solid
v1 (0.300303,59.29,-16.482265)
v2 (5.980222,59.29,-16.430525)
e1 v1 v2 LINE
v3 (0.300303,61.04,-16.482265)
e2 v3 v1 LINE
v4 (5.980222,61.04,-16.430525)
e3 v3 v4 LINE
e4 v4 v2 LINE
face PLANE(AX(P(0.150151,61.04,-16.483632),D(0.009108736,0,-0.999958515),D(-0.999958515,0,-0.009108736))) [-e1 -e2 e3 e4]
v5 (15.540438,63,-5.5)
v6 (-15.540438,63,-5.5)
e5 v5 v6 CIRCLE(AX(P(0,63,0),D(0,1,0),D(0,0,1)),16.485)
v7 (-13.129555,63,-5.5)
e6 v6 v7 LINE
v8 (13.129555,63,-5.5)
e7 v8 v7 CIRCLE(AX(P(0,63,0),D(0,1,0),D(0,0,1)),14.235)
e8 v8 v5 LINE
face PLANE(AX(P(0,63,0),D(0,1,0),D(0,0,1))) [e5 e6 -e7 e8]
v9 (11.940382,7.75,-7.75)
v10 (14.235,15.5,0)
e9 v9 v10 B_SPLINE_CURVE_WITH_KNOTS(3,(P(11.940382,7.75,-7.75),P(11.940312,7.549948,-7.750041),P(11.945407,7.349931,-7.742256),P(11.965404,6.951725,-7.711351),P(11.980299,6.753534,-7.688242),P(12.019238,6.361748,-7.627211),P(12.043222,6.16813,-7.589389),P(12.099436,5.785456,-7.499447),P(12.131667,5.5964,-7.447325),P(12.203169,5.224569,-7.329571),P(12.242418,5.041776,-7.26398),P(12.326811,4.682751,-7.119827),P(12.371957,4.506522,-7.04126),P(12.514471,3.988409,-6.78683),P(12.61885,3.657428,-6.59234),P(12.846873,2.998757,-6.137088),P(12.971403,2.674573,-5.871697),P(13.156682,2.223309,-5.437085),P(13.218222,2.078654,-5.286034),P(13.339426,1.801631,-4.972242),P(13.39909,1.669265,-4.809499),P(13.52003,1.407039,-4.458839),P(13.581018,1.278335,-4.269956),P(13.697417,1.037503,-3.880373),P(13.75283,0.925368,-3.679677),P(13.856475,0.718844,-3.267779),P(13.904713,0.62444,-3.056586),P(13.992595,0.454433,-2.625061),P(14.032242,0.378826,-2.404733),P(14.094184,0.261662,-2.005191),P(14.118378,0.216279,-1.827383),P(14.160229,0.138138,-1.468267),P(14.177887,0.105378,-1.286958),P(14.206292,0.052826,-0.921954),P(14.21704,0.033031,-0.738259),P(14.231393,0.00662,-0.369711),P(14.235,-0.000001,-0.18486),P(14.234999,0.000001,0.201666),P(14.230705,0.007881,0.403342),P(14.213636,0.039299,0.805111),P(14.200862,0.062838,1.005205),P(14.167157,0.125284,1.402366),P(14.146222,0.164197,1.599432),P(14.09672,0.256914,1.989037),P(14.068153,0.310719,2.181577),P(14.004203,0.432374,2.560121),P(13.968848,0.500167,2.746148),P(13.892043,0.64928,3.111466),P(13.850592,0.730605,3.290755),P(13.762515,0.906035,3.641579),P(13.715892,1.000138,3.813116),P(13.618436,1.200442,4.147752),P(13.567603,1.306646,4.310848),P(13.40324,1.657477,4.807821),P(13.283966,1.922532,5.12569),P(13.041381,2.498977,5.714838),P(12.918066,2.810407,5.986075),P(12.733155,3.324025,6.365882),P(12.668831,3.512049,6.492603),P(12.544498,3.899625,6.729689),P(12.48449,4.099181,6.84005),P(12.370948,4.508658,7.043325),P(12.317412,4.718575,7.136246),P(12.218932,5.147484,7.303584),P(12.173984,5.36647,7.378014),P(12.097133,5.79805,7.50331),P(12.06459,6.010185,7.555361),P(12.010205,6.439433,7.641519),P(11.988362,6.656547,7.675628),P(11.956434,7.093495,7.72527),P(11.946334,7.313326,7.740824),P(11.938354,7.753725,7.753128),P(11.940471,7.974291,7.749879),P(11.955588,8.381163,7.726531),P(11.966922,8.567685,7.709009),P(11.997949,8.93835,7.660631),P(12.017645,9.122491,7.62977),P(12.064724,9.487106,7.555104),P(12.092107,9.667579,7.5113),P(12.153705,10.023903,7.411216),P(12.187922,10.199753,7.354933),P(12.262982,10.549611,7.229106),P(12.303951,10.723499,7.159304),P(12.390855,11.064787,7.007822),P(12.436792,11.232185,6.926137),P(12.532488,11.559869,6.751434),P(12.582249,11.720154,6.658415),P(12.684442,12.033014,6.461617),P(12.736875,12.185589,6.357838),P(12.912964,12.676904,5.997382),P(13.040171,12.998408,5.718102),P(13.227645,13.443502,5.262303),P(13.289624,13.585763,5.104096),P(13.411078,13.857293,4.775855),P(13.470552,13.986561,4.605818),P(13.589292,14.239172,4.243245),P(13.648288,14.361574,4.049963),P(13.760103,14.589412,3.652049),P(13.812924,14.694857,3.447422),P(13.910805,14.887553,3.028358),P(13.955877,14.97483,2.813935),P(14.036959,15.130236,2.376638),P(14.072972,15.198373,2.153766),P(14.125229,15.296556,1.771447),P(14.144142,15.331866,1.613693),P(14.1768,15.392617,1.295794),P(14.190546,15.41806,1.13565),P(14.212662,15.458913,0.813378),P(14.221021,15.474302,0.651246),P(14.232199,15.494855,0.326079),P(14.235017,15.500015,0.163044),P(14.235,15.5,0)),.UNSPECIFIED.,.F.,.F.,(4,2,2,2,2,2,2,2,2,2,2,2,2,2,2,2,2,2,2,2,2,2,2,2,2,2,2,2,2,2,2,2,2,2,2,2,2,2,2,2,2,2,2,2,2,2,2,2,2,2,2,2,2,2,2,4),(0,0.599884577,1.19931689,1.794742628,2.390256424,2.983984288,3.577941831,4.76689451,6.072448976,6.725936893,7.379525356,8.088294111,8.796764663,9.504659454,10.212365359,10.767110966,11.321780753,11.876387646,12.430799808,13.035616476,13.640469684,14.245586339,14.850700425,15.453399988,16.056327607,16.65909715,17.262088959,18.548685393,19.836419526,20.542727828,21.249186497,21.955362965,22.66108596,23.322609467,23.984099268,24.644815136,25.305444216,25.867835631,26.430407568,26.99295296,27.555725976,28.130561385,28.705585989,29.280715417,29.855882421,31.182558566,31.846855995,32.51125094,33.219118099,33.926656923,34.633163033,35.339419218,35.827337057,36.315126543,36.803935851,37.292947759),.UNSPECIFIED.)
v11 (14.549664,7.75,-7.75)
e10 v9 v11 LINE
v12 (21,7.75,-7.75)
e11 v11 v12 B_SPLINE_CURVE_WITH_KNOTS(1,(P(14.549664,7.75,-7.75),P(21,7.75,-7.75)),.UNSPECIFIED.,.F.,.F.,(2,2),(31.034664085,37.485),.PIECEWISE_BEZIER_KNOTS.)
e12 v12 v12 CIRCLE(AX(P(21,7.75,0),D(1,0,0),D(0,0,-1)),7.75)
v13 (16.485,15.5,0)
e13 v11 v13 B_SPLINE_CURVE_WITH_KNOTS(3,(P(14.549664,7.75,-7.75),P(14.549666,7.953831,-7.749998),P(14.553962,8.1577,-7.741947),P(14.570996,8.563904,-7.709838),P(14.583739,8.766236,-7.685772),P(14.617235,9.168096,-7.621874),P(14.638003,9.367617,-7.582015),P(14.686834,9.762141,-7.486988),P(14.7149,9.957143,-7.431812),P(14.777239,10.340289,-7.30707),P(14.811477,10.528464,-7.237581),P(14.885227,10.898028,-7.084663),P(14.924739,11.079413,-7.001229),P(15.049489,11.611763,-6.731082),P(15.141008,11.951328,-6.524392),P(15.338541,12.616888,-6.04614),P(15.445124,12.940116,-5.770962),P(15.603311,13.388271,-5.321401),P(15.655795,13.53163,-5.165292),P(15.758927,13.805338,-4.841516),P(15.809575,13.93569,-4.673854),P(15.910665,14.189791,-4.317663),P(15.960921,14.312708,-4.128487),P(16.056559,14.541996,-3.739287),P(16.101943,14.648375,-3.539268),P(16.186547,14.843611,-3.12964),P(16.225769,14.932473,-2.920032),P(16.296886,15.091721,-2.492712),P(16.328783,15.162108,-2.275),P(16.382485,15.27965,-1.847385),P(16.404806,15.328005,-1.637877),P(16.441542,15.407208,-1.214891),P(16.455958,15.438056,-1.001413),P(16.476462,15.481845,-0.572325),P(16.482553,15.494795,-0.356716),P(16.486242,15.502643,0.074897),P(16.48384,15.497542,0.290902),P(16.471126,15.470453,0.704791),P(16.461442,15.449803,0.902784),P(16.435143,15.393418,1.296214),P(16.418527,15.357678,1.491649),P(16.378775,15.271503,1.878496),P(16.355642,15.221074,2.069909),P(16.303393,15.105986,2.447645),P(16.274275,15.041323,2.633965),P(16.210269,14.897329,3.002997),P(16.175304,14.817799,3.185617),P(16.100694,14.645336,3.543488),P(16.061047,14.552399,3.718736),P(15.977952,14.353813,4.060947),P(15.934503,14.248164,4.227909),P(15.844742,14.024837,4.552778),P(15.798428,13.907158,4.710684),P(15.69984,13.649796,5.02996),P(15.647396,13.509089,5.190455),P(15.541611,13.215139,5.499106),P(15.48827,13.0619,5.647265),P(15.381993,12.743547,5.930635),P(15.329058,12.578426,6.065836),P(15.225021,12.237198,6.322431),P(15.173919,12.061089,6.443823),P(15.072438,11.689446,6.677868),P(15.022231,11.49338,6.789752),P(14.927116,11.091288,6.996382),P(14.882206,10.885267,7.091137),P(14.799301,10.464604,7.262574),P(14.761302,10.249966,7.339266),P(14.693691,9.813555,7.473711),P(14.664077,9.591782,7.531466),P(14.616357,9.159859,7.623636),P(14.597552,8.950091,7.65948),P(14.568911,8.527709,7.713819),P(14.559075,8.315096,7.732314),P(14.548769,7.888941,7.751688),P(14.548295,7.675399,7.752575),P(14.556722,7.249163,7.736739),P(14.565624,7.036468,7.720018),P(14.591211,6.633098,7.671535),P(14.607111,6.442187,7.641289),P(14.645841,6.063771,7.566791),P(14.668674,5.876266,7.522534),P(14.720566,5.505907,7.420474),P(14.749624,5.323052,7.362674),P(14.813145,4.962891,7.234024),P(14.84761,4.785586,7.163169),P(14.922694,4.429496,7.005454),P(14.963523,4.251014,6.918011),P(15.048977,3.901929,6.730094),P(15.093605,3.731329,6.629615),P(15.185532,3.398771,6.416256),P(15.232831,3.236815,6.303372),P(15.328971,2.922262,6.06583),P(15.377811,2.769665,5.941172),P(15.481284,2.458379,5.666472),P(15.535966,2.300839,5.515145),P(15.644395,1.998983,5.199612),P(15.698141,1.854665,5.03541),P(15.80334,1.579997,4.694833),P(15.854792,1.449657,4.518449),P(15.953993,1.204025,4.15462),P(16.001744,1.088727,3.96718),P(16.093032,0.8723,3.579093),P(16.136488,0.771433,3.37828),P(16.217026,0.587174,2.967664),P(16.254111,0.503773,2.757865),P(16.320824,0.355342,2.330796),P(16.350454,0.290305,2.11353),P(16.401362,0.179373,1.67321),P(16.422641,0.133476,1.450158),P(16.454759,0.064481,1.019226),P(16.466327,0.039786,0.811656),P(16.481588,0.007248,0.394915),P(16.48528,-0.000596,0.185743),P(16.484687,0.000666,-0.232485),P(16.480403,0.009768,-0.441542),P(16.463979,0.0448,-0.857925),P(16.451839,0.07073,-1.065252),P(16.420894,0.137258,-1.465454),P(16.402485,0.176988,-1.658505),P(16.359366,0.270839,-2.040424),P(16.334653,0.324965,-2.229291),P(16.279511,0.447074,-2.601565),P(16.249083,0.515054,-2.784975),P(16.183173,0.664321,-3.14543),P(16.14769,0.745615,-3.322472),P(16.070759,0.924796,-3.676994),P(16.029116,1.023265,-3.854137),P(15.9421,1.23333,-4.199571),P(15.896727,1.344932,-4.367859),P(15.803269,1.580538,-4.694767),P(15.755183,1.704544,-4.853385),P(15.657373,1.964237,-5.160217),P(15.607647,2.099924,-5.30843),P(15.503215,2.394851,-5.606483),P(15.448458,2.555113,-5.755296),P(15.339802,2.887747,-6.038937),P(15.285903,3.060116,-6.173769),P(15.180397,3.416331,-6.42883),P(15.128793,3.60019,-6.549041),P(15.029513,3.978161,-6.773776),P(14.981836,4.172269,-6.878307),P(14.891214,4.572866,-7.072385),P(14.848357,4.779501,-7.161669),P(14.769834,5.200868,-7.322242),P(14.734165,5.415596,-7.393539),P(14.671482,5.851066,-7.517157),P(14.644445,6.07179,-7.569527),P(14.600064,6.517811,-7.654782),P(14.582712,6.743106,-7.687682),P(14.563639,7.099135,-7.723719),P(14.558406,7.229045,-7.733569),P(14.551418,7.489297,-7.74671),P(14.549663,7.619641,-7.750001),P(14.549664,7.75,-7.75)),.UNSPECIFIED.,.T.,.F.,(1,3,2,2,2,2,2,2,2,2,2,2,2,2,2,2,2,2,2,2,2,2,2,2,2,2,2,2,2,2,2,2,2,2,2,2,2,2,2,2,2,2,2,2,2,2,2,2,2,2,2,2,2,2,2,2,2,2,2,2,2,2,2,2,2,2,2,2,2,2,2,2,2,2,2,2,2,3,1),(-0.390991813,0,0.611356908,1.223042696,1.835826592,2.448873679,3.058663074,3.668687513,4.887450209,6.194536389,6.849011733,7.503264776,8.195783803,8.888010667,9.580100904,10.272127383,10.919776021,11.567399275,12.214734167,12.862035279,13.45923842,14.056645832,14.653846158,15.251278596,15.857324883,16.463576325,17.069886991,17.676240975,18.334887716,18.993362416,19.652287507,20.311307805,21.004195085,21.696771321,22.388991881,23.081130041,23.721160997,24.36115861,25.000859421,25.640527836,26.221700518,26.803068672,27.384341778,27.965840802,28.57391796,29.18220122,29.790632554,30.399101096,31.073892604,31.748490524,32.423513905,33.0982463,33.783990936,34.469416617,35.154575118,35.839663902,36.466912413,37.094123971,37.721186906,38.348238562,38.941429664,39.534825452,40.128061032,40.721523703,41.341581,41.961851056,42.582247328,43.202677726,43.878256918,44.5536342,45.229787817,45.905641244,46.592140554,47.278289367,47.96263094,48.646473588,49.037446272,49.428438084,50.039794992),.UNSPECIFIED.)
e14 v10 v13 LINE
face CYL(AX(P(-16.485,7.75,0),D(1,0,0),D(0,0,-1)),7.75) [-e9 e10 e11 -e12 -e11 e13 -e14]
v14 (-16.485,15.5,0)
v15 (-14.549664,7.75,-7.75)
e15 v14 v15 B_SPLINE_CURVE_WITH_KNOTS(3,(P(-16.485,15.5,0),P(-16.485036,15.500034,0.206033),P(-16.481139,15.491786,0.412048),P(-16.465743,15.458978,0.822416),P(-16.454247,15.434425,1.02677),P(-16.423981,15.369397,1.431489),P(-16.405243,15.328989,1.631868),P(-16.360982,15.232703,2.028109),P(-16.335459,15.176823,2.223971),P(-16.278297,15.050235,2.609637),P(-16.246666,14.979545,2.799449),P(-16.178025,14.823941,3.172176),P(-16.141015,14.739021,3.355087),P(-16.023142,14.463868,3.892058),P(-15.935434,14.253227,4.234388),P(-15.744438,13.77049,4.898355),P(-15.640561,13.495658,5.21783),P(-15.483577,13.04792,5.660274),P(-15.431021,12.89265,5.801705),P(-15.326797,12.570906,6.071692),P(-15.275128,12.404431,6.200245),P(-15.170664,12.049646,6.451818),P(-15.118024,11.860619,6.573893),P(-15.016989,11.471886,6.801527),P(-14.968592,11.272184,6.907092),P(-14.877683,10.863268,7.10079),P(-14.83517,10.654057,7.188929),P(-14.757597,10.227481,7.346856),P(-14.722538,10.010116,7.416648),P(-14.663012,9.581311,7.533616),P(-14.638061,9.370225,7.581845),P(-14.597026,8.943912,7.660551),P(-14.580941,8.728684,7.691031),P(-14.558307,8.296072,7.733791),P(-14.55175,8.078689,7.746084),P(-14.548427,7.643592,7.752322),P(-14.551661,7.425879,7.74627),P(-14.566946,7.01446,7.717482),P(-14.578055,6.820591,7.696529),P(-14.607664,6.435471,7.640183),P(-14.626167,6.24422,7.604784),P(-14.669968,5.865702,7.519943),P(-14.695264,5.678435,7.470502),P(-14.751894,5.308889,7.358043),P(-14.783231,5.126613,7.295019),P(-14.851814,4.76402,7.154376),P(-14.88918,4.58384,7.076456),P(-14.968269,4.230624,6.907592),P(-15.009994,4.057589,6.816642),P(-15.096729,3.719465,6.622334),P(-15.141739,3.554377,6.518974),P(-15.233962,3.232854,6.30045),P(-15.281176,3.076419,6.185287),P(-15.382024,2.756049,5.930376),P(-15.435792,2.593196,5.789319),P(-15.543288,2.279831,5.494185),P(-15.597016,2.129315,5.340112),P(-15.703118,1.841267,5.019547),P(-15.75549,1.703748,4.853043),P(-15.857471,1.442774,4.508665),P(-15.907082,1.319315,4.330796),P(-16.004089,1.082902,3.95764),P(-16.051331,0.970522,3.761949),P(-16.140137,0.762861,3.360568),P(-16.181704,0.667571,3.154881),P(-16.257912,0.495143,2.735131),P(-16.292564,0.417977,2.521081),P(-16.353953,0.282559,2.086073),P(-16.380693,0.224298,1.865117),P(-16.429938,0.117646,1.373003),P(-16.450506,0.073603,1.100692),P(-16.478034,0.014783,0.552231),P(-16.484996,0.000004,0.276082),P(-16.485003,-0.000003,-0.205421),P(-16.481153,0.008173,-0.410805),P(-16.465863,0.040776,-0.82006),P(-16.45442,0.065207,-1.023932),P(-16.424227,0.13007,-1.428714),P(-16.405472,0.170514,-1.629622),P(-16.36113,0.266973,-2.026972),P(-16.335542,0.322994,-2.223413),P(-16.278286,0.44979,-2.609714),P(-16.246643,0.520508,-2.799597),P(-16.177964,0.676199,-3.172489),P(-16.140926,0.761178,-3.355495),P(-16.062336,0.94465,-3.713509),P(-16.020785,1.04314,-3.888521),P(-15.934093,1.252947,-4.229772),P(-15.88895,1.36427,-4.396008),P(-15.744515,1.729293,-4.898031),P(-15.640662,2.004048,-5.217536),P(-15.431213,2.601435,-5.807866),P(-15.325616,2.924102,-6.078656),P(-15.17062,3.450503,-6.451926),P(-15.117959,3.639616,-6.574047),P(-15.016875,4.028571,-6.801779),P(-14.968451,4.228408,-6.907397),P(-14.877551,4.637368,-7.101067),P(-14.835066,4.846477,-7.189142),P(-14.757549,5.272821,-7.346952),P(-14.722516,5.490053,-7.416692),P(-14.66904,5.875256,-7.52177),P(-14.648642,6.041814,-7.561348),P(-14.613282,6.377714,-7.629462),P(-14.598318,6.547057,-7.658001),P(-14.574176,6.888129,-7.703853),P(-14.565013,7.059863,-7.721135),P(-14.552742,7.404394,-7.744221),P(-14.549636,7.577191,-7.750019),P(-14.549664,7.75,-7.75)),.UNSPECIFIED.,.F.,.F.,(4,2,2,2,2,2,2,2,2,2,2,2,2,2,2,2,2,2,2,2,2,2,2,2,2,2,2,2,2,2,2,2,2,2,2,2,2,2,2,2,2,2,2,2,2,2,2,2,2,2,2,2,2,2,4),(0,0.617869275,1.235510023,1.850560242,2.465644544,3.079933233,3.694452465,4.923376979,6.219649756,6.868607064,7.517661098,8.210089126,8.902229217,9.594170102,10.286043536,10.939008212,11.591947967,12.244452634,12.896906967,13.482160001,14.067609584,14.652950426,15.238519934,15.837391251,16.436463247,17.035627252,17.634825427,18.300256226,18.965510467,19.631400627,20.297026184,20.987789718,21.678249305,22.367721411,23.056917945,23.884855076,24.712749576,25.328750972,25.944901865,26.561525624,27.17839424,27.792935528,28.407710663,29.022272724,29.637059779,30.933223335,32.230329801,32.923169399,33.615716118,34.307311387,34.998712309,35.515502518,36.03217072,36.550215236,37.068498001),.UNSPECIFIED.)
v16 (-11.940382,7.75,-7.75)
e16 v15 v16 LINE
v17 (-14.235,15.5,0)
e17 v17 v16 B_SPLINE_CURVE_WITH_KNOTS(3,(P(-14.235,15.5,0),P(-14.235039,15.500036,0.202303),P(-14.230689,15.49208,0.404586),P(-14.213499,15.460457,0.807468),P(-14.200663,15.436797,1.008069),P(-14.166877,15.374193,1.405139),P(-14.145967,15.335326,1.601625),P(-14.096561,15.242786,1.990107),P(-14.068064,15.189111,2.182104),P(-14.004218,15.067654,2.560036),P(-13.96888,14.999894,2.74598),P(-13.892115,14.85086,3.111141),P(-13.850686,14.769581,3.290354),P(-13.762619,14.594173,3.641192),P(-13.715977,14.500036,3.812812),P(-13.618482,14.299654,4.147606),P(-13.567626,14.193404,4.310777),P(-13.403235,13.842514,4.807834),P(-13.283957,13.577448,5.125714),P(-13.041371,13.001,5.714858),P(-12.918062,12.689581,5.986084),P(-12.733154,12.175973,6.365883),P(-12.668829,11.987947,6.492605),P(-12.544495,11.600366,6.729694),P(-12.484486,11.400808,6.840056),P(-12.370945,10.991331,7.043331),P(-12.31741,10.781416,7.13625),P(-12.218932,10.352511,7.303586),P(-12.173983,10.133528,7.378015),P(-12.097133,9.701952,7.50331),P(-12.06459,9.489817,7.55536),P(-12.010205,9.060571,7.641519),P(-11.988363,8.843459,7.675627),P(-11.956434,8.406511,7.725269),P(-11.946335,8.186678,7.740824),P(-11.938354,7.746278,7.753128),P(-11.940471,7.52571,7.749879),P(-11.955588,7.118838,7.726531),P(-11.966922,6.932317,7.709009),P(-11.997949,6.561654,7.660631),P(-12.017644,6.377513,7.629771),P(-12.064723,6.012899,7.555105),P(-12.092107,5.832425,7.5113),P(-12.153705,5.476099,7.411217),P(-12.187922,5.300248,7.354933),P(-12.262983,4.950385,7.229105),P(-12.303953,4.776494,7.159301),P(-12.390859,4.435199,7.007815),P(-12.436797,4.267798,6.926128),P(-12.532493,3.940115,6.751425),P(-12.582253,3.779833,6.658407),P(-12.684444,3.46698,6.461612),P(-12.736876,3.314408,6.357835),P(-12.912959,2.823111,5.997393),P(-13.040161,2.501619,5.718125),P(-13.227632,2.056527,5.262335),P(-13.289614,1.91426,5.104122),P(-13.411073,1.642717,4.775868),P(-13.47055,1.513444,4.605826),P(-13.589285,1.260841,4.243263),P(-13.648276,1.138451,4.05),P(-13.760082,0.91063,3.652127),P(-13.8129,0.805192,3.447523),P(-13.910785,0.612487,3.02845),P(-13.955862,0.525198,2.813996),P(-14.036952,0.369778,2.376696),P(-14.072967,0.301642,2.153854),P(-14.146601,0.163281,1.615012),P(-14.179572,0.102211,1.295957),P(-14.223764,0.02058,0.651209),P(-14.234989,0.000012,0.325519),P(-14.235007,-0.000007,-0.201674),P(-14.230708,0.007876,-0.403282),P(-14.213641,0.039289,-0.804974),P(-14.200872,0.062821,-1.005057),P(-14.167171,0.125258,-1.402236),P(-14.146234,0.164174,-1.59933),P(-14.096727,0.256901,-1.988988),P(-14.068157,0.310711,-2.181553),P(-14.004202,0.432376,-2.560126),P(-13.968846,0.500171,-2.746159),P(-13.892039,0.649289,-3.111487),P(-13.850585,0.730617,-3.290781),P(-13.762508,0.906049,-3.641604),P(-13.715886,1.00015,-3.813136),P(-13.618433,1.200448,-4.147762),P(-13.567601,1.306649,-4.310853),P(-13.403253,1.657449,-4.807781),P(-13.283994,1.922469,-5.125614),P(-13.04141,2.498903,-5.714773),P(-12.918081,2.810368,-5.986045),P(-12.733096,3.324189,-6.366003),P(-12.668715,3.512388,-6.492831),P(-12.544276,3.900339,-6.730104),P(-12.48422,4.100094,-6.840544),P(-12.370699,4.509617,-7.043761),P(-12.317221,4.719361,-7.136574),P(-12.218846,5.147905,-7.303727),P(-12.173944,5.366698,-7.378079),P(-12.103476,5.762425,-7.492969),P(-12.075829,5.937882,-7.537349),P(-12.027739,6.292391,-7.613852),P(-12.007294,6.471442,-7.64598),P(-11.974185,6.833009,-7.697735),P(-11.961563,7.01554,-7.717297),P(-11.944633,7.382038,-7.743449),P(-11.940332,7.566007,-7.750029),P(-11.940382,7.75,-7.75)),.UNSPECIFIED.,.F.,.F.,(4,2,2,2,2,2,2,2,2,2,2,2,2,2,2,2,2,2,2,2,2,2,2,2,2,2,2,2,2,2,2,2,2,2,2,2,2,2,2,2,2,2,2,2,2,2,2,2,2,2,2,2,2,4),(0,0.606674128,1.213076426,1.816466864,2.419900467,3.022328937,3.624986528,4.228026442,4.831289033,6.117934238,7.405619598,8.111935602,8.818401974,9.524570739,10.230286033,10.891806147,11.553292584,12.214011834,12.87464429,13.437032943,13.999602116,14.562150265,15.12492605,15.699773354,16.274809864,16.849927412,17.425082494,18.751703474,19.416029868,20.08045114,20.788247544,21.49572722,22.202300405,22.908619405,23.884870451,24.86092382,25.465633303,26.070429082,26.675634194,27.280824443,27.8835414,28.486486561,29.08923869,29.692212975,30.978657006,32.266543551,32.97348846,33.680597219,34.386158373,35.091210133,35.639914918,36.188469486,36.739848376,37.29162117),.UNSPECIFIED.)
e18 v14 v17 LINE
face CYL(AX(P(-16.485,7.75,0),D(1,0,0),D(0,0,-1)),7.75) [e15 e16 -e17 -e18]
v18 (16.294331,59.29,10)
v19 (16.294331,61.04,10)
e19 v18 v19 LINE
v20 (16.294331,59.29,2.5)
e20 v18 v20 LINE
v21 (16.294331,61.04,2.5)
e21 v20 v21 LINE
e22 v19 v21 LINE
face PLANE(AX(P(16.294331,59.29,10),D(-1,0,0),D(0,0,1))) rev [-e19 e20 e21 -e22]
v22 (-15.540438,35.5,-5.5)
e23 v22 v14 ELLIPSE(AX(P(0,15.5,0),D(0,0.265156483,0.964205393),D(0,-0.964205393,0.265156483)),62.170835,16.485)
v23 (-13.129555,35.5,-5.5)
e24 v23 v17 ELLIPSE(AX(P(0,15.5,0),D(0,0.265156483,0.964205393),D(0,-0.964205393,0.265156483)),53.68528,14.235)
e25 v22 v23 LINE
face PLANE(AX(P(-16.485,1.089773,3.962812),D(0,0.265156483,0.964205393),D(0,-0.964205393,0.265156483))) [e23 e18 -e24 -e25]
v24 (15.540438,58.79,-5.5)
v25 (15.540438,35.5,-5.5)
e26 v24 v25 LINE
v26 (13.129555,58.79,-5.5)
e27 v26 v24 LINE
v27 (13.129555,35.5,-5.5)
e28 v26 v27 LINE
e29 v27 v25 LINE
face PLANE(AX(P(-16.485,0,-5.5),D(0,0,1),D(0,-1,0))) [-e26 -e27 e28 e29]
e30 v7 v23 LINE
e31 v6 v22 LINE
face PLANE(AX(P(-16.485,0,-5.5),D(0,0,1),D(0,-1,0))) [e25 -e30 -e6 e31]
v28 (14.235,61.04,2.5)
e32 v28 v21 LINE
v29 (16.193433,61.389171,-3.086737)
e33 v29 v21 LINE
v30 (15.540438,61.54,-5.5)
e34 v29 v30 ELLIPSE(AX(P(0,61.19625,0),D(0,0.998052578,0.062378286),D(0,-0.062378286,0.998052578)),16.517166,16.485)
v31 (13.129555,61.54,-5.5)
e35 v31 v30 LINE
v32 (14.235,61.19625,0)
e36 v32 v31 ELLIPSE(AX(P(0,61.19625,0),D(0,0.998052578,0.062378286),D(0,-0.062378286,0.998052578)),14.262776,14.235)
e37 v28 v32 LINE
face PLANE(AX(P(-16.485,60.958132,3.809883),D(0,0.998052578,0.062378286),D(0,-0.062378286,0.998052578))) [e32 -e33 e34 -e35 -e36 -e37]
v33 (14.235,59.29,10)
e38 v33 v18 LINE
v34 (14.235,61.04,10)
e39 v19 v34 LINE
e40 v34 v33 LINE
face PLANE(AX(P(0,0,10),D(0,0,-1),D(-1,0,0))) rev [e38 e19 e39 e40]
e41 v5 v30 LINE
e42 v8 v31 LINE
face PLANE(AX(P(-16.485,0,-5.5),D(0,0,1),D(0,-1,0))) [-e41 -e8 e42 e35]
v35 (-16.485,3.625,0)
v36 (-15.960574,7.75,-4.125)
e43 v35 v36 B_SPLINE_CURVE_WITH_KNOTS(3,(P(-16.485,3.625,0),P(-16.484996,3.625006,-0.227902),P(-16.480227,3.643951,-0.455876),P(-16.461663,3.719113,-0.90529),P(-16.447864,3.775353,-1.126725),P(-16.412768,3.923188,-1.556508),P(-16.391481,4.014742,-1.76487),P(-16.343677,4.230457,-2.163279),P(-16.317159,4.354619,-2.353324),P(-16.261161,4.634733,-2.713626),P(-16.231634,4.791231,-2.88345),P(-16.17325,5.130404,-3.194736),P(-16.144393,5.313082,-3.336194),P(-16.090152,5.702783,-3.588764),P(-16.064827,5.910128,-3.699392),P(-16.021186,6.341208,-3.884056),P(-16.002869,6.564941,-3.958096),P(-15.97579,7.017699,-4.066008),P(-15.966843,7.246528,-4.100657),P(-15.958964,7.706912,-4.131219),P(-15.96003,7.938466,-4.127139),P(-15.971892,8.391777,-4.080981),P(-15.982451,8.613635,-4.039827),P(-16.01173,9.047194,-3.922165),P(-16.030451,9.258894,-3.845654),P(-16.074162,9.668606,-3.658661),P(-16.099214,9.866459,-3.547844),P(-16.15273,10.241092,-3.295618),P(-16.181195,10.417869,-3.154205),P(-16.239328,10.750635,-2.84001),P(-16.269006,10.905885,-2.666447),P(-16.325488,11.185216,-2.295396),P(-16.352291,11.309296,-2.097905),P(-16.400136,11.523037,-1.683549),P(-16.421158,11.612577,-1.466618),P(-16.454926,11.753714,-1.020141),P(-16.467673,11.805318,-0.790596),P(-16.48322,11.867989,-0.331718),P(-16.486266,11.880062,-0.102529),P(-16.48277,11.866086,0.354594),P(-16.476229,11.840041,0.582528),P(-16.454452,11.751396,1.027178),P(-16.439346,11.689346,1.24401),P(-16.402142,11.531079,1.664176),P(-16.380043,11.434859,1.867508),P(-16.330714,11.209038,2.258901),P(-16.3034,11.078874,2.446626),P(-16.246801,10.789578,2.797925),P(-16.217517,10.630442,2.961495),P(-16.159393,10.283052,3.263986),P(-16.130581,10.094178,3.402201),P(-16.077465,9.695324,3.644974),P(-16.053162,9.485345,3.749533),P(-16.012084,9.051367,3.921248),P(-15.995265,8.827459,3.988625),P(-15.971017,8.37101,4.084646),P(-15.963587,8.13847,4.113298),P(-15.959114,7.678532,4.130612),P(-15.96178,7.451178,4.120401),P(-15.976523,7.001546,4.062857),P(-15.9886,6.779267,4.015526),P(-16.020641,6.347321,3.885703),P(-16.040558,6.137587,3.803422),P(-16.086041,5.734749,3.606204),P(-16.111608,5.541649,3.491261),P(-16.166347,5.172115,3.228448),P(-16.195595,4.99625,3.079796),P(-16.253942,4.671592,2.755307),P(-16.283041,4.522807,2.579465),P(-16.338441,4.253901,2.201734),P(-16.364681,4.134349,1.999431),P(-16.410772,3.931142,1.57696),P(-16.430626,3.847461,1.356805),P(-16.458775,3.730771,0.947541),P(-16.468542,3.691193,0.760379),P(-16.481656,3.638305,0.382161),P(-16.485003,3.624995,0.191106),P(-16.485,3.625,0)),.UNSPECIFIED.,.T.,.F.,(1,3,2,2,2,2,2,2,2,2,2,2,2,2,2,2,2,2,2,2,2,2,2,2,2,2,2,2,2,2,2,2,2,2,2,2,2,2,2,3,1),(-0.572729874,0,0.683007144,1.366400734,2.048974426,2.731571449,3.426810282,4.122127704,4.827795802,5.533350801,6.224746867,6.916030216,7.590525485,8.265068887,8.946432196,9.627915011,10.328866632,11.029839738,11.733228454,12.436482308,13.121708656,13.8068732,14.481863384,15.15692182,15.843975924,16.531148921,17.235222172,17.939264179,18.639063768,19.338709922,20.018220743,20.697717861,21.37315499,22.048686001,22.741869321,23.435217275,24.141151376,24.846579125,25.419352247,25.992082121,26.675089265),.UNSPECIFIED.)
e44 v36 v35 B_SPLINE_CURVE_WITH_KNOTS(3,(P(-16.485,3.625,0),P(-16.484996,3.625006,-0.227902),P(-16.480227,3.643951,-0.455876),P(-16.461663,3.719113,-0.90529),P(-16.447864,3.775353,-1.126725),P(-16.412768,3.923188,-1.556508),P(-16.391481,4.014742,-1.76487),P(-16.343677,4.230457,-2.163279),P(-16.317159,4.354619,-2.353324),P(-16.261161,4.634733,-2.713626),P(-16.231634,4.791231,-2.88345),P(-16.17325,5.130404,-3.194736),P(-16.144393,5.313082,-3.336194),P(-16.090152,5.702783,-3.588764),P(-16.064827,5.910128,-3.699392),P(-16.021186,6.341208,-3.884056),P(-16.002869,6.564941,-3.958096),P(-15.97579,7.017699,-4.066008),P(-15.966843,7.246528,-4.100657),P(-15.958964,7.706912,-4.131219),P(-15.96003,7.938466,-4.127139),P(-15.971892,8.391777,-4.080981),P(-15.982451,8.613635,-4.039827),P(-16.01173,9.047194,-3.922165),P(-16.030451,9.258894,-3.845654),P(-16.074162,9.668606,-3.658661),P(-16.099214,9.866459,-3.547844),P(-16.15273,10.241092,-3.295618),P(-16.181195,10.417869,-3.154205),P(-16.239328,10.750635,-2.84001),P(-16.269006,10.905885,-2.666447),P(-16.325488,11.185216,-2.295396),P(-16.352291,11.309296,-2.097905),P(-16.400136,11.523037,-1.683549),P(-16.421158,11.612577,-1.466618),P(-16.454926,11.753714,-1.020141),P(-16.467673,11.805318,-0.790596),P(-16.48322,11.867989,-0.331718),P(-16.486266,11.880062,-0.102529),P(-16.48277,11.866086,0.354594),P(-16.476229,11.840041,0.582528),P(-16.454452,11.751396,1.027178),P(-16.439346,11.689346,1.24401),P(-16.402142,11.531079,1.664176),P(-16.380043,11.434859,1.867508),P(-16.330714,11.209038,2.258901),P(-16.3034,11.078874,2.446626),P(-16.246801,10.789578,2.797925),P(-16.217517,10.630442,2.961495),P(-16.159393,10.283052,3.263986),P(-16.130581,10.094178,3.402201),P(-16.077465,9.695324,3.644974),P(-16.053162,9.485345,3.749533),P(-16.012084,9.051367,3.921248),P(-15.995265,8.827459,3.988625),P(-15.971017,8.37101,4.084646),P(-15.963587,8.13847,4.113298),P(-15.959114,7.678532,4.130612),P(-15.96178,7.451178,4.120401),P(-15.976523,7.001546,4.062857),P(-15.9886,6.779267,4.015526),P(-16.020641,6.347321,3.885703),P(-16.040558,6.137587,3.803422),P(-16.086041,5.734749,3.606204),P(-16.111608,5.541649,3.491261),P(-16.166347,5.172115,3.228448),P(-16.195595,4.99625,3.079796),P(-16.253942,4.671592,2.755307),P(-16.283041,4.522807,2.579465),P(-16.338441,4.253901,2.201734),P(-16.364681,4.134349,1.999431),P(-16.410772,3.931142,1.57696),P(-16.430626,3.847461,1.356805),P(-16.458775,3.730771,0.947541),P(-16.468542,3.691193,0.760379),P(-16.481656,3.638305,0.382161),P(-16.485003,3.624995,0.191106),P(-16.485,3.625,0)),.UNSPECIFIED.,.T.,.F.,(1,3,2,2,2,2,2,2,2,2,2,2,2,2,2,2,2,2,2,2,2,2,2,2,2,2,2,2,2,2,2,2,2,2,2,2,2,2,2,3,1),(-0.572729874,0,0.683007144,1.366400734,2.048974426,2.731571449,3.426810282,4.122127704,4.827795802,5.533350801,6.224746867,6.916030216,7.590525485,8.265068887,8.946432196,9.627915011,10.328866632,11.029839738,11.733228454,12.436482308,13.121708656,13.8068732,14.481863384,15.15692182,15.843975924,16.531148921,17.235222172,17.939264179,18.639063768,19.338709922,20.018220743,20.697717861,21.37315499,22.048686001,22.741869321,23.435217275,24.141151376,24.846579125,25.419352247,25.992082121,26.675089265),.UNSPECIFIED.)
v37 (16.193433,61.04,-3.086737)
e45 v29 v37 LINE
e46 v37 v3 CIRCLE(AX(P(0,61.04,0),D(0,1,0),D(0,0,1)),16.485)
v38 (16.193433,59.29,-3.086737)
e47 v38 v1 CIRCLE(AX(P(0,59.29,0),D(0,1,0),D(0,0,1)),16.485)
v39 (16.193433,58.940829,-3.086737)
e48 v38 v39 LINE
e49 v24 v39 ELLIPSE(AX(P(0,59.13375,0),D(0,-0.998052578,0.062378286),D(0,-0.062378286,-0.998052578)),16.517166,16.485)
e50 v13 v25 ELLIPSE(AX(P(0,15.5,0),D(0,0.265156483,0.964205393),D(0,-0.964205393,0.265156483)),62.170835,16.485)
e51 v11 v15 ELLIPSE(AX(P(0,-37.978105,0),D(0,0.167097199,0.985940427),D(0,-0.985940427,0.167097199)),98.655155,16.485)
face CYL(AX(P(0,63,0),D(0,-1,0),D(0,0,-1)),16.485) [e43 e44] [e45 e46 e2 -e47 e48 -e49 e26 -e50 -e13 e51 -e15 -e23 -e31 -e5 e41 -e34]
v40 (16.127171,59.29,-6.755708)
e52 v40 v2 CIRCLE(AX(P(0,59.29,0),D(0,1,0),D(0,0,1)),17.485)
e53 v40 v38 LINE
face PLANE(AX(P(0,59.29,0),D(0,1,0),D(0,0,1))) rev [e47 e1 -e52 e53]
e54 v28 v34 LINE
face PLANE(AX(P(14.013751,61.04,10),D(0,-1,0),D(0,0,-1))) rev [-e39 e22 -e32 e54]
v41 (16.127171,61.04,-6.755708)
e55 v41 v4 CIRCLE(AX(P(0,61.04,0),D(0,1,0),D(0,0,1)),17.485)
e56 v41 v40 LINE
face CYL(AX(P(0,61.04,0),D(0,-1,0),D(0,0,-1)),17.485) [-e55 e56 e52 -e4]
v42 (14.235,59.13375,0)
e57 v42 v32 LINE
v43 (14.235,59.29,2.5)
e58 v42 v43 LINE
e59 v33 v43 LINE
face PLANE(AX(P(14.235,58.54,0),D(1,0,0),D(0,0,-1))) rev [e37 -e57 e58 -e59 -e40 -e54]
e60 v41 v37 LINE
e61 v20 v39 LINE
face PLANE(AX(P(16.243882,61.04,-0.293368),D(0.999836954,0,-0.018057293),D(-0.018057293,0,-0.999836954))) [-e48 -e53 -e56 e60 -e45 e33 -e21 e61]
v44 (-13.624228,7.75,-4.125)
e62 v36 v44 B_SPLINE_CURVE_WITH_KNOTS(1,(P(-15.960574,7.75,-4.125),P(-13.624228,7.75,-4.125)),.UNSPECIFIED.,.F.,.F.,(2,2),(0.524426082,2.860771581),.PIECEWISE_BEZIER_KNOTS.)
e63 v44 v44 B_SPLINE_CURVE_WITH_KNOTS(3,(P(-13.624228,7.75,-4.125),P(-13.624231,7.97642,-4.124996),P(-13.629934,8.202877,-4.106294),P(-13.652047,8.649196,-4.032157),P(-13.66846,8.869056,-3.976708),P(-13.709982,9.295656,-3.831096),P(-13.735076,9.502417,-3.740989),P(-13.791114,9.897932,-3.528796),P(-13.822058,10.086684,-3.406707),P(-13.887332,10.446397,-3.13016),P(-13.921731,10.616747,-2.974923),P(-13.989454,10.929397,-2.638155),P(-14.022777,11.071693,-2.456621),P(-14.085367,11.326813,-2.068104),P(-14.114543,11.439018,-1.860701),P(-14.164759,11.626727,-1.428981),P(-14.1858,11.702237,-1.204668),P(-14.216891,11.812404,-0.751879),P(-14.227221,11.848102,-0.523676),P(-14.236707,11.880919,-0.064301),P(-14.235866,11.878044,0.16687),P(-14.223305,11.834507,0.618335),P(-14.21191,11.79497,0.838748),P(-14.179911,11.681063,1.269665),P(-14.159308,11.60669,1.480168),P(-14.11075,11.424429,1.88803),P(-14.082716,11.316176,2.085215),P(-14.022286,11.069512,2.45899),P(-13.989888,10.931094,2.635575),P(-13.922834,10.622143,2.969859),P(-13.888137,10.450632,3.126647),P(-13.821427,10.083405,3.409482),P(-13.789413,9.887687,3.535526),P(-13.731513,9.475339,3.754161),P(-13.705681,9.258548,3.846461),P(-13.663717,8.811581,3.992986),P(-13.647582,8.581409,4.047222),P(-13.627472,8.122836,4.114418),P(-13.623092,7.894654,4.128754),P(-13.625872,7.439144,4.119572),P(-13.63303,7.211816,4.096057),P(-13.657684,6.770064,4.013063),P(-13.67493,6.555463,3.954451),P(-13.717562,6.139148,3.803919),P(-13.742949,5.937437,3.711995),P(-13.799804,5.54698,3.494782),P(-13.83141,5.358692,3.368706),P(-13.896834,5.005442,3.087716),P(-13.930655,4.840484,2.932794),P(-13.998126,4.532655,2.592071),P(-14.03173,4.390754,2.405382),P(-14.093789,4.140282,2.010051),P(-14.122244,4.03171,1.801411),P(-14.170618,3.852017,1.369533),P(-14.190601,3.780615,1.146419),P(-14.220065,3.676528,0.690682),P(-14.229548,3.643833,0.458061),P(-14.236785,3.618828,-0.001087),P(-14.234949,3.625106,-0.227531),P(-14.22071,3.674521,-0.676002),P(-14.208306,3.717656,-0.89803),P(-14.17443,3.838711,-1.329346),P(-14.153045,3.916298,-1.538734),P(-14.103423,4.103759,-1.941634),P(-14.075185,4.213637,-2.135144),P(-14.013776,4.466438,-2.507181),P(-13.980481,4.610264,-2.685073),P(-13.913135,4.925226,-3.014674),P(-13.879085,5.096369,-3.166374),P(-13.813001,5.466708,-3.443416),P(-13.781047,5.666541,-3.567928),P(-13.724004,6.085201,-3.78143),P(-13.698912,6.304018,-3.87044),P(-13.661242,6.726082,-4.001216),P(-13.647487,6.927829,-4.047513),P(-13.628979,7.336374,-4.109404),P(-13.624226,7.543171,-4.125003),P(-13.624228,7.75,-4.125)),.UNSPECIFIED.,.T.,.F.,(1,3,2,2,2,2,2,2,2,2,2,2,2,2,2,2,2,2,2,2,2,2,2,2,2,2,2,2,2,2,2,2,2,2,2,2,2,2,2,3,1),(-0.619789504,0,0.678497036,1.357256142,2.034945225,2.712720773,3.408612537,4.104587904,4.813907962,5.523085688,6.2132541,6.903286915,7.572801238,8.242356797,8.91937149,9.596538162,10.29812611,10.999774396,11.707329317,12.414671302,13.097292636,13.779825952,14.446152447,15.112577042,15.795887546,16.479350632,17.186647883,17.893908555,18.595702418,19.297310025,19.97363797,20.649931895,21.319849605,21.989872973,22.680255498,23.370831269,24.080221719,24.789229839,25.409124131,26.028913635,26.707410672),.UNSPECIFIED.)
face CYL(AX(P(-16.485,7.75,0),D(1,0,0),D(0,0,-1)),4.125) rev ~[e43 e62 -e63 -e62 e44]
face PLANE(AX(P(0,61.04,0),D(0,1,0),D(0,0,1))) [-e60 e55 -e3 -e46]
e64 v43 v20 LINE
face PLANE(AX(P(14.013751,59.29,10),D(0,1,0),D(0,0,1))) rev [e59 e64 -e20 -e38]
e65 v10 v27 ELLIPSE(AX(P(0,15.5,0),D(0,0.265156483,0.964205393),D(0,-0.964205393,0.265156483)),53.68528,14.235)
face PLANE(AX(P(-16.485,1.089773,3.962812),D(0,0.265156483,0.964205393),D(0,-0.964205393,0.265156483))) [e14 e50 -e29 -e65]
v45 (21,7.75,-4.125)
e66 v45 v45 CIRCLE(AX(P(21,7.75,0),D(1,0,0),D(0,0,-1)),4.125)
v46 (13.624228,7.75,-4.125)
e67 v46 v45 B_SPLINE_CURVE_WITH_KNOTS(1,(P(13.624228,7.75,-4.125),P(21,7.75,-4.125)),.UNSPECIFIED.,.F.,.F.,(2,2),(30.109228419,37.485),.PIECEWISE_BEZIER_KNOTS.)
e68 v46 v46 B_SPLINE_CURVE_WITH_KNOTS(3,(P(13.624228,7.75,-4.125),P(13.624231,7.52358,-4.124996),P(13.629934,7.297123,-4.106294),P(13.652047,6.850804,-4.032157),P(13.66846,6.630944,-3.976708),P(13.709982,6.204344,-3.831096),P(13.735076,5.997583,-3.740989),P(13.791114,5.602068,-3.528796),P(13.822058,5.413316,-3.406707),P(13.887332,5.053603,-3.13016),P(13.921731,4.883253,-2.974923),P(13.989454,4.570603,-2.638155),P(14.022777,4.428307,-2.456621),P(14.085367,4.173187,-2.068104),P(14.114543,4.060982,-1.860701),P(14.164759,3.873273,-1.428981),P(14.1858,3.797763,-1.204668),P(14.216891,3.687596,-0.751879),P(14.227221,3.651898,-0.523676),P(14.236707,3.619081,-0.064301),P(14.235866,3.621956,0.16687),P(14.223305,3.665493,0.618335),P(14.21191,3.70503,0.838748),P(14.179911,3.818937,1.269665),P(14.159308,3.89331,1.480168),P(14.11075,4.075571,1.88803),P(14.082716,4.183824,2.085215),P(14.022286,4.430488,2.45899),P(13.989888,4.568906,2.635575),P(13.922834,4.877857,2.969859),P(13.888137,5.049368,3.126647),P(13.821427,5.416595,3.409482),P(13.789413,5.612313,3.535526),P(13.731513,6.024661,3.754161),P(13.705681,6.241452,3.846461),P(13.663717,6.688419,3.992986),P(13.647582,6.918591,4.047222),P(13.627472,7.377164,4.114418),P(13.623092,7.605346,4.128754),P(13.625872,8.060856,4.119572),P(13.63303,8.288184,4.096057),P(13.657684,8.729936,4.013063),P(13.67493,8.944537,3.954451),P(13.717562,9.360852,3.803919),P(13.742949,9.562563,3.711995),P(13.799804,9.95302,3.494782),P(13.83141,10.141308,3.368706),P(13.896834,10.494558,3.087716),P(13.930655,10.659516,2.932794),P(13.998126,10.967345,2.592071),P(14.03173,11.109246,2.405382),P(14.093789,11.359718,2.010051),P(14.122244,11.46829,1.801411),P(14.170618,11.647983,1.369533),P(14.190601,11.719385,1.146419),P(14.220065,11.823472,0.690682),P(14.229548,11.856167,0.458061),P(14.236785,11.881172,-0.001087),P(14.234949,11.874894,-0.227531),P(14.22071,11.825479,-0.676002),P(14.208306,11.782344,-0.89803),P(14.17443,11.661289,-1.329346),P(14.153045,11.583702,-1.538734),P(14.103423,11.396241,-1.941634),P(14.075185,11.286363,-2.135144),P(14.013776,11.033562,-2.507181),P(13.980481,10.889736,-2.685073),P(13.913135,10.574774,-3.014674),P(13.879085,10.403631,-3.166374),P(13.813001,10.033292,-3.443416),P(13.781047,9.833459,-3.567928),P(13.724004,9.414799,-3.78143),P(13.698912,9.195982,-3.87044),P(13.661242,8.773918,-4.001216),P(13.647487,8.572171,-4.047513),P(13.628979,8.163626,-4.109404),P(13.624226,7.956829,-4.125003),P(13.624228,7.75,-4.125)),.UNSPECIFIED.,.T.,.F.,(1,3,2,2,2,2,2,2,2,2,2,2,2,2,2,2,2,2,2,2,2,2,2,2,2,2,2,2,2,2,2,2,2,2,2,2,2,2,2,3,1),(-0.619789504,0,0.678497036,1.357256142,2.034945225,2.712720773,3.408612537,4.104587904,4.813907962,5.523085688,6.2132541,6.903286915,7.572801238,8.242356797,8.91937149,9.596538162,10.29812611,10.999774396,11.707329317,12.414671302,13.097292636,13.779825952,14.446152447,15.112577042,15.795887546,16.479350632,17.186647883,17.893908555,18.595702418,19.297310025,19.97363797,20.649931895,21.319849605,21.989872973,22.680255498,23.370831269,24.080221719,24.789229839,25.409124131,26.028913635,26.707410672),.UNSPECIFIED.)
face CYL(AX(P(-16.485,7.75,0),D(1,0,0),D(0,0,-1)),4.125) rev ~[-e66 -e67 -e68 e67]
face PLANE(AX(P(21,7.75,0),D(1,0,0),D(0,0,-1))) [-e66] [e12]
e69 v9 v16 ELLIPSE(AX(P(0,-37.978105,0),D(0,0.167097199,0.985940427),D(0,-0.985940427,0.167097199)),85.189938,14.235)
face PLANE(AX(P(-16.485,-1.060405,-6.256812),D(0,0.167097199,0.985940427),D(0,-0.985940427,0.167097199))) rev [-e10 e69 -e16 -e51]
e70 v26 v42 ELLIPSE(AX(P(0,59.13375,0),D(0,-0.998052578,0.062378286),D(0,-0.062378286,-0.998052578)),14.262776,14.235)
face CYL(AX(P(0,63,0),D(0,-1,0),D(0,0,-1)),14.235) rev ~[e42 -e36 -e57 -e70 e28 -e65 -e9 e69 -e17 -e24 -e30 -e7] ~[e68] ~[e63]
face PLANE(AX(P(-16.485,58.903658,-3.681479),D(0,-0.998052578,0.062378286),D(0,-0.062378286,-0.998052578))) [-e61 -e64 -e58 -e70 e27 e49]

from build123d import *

# Parameters (mm, degrees)
SKETCH1_R               = 16.485
SKETCH1_R_2             = 14.235
BOSS_EXTRUDE1_DEPTH     = 63
SKETCH2_R               = 4.125
CUT_EXTRUDE1_DEPTH      = 73.991616813
CUT_EXTRUDE2_START      = -32.970000348
CUT_EXTRUDE2_DEPTH      = 32.970000348
CUT_EXTRUDE4_DEPTH      = 68.175222223
CUT_EXTRUDE4_DEPTH_BACK = 15
BOSS_EXTRUDE2_DEPTH     = 0.875
SKETCH9_W               = 2.280579787
SKETCH9_H               = 1.75
BOSS_EXTRUDE4_DEPTH     = 7.5
SKETCH10_W              = 0.221248718
SKETCH10_H              = 10
CUT_EXTRUDE5_DEPTH      = 2.5
BOSS_EXTRUDE5_REACH     = 77.139
SKETCH11_R              = 7.75
SKETCH11_R_2            = 4.125
CUT_EXTRUDE7_DEPTH      = 10


# Read off the part's stored shape, not the designer's step: Cut-Extrude2
with BuildPart() as part:
    # Sketch1 → Boss-Extrude1 (new body)
    with BuildSketch(Plane(origin=(0, 0, 0), x_dir=(1, 0, 0), z_dir=(0, 1, 0))):
        with Locations(Location((0, 0, 0), (0, 0, 270))):
            Circle(SKETCH1_R)
        with Locations(Location((0, 0, 0), (0, 0, 270))):
            Circle(SKETCH1_R_2, mode=Mode.SUBTRACT)
    extrude(amount=BOSS_EXTRUDE1_DEPTH)

    # Sketch2 → Cut-Extrude1 (cut, through all)
    with BuildSketch(Plane(origin=(16.485, 0, 0), x_dir=(0, 0, -1), z_dir=(1, 0, 0))):
        with Locations((0, 7.75)):
            Circle(SKETCH2_R)
    extrude(amount=-CUT_EXTRUDE1_DEPTH, mode=Mode.SUBTRACT)

    # Cut-Extrude2 outline → Cut-Extrude2 (cut)
    with BuildSketch(Plane(origin=(16.485, 0, 0), x_dir=(0, 0, -1), z_dir=(1, 0, 0)).offset(CUT_EXTRUDE2_START)):
        Polygon((5.5, 63), (-16.485, 63), (-16.485, 61.04), (-2.5, 61.04), (5.5, 61.54), align=None)
        with BuildLine():
            Line((-2.5, 59.29), (-16.485, 59.29))
            Line((-16.485, 59.29), (-16.485, 0))
            Line((-16.485, 0), (1.7e-08, 0))
            ThreePointArc((1.7e-08, 0), (-7.75, 7.749999991), (0, 15.5))
            Line((0, 15.5), (5.5, 35.5))
            Line((5.5, 35.5), (5.5, 58.79))
            Line((5.5, 58.79), (-2.5, 59.29))
        make_face()
        with BuildLine():
            ThreePointArc((7.75, 7.75), (5.48007756, 2.269922452), (1.7e-08, 0))
            Line((1.7e-08, 0), (16.485, 0))
            Line((16.485, 0), (16.485, 59.29))
            Line((16.485, 59.29), (7.75, 7.75))
        make_face()
    extrude(amount=CUT_EXTRUDE2_DEPTH, mode=Mode.SUBTRACT)

    # Sketch6 → Cut-Extrude4 (cut, two sides: drawn at the far end of the back side and taken through both)
    with BuildSketch(Plane(origin=(0, 63, 0), x_dir=(1, 0, 0), z_dir=(0, 1, 0)).offset(-CUT_EXTRUDE4_DEPTH_BACK)):
        Polygon((-103.23133718, 5.5), (-15.540438379, 5.5), (-13.1295554, 5.5), (0, 0), (14.013751282, -2.5), (16.294331069, -2.5), (103.985229871, -2.5), (97.219313689, -177.751240534), (-109.997253363, -169.751240534), align=None)
    extrude(amount=CUT_EXTRUDE4_DEPTH + CUT_EXTRUDE4_DEPTH_BACK, mode=Mode.SUBTRACT)

    # Sketch7 → Boss-Extrude2 (add, symmetric)
    with BuildSketch(Plane(origin=(0, 60.165, 0), x_dir=(1, 0, 0), z_dir=(0, 1, 0))):
        with BuildLine():
            ThreePointArc((0.300302569, 16.48226451), (10.624070386, 12.604933694), (16.193433276, 3.086736743))
            Line((16.193433276, 3.086736743), (16.127170788, 6.755707763))
            ThreePointArc((16.127170788, 6.755707763), (12.065849771, 12.654662947), (5.980222206, 16.430525474))
            Line((5.980222206, 16.430525474), (0.300302569, 16.48226451))
        make_face()
    extrude(amount=BOSS_EXTRUDE2_DEPTH, both=True)

    # Sketch9 → Boss-Extrude4 (add)
    with BuildSketch(Plane.XY.offset(2.5)):
        with Locations((15.154041176, 60.165)):
            Rectangle(SKETCH9_W, SKETCH9_H)
    extrude(amount=BOSS_EXTRUDE4_DEPTH)

    # Sketch10 → Cut-Extrude5 (cut, symmetric)
    with BuildSketch(Plane(origin=(0, 61.04, 0), x_dir=(1, 0, 0), z_dir=(0, 1, 0))):
        with Locations((14.124375641, -5)):
            Rectangle(SKETCH10_W, SKETCH10_H)
    extrude(amount=CUT_EXTRUDE5_DEPTH, both=True, mode=Mode.SUBTRACT)

    # Sketch11 → Boss-Extrude5 (add, up to next)
    with BuildSketch(Plane(origin=(21, 0, 0), x_dir=(0, 0, -1), z_dir=(1, 0, 0)), mode=Mode.PRIVATE) as boss_extrude5_sk1:
        with Locations((0, 7.75)):
            Circle(SKETCH11_R)
        with Locations((0, 7.75)):
            Circle(SKETCH11_R_2, mode=Mode.SUBTRACT)
    boss_extrude5_tool1 = extrude(boss_extrude5_sk1.sketch, amount=-BOSS_EXTRUDE5_REACH, mode=Mode.PRIVATE) - part.part
    add(boss_extrude5_tool1.solids().sort_by_distance((21, 7.75, 7.530797))[0])

    # Sketch16 → Cut-Extrude7 (cut)
    with BuildSketch(Plane(origin=(0, 63, 0), x_dir=(1, 0, 0), z_dir=(0, 1, 0))):
        Polygon((16.127170788, 6.755707763), (16.294331069, -2.5), (18.305732321, -2.5), (18.305732321, 6.795053101), align=None)
    extrude(amount=-CUT_EXTRUDE7_DEPTH, mode=Mode.SUBTRACT)


solid = part.part
